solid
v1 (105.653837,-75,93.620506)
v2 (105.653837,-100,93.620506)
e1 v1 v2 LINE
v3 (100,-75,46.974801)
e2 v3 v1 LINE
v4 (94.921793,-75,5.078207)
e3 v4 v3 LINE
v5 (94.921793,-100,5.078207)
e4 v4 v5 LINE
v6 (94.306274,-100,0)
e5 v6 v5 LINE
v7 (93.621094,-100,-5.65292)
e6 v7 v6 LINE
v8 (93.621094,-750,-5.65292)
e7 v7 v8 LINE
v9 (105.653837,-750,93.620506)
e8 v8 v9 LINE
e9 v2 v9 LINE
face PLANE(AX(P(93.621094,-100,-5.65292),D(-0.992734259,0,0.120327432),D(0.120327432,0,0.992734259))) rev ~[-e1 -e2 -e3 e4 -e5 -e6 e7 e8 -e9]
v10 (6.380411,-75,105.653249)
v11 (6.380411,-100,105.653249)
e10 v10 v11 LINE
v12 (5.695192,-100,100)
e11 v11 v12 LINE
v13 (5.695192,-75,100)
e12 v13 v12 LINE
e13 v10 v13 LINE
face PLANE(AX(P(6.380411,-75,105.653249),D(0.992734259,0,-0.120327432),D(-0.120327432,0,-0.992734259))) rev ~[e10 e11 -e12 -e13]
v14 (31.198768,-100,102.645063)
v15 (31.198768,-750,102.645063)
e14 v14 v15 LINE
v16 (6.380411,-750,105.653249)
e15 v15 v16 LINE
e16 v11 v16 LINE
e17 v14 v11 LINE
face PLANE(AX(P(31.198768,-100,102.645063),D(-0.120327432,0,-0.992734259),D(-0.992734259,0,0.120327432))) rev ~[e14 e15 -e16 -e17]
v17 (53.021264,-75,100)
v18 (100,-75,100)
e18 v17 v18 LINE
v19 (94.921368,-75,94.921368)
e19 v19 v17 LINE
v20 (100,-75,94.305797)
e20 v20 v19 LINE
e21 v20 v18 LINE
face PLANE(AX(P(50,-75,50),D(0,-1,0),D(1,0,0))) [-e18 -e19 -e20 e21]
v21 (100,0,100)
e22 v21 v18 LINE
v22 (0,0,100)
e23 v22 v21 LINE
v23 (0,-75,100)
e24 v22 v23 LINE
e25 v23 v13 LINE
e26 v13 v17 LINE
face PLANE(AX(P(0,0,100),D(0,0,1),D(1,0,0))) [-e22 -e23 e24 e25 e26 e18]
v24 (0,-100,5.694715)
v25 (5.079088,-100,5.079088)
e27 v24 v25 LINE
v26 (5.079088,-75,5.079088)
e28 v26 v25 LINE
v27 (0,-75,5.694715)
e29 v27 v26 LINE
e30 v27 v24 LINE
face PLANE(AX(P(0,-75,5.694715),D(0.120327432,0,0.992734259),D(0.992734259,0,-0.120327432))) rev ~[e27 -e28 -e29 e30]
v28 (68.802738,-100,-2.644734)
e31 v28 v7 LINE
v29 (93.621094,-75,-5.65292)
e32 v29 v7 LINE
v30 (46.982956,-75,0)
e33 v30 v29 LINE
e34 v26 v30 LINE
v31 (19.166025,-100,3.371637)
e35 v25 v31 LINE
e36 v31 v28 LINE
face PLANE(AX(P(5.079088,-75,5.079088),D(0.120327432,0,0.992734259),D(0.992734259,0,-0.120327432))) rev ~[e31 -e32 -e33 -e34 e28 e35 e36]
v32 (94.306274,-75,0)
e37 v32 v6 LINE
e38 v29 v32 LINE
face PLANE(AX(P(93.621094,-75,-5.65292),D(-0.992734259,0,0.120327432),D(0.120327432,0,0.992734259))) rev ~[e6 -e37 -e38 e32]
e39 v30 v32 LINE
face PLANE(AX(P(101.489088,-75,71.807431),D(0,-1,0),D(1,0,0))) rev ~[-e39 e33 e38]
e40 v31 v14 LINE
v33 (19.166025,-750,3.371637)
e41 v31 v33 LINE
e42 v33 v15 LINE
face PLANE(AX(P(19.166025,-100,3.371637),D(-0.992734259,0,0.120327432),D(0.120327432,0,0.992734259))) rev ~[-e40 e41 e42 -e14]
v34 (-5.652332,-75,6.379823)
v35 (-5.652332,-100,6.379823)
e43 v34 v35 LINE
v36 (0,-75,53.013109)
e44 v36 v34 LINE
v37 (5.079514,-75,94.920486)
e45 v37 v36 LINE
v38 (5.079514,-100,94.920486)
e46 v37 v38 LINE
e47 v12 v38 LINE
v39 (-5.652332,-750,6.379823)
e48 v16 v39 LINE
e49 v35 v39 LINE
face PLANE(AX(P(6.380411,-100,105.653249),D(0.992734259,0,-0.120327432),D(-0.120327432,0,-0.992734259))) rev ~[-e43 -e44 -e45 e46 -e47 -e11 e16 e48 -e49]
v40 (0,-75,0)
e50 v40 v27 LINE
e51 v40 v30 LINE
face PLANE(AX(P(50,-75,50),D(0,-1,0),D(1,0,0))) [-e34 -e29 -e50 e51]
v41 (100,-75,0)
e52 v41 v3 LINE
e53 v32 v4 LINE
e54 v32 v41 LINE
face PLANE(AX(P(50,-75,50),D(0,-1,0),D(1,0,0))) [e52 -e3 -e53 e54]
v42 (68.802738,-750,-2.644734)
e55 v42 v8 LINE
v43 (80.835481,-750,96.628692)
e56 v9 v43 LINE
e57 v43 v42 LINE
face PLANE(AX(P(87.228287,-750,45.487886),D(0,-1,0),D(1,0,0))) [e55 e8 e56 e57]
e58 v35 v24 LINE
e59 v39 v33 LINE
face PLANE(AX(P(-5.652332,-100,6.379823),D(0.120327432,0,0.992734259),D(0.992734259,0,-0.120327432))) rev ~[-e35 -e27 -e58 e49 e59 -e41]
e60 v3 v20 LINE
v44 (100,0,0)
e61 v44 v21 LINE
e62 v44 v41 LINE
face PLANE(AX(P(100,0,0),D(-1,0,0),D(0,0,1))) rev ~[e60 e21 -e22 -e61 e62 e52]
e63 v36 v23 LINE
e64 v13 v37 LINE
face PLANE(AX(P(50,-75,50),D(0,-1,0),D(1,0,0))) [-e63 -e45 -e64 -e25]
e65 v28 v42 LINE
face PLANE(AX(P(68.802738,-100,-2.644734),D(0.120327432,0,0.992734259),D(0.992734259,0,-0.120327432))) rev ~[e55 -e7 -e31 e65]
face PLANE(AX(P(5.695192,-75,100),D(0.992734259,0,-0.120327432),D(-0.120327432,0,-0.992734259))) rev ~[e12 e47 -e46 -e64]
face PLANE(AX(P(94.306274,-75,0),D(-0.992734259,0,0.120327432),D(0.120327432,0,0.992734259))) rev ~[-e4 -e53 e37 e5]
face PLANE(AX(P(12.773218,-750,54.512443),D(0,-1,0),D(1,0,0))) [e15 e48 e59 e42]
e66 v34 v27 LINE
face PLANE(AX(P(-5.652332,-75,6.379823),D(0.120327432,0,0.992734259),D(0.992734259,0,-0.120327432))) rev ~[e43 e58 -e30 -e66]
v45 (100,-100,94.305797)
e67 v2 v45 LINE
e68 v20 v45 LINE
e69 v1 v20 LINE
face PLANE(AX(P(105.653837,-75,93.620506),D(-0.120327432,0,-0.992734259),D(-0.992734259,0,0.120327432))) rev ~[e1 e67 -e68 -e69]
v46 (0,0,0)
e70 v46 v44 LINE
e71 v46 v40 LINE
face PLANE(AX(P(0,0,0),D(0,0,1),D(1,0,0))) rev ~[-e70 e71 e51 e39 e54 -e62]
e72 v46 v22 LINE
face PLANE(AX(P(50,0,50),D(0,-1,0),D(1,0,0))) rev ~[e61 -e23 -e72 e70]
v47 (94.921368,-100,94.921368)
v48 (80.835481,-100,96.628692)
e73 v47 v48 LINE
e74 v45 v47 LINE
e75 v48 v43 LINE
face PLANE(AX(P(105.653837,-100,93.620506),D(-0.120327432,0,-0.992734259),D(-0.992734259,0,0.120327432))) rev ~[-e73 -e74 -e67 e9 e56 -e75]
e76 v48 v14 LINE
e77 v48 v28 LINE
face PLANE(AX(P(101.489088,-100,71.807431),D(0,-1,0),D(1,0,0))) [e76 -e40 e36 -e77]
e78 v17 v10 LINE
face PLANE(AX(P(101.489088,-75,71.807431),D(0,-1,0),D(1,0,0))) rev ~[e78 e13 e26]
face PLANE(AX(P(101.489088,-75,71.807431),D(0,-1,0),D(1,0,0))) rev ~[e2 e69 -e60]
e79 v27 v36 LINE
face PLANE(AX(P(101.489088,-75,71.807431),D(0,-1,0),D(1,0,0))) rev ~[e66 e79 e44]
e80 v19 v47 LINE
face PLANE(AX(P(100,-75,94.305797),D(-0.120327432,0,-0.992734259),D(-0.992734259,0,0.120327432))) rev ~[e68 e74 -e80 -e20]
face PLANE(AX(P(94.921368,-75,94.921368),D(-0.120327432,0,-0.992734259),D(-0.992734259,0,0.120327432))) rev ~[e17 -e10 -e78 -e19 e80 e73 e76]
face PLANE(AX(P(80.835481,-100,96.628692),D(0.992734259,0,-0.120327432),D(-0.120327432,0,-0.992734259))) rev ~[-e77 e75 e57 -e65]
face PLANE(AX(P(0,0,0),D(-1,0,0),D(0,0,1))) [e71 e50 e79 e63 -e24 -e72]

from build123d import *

# Parameters (mm, degrees)
F0_W     = 100
F0_H     = 100
F1_DEPTH = 75
F3_DEPTH = 25
F5_DEPTH = 650


# Not quite as in the source:
# - a feature names something its author has since deleted; it is built from what else it names


with BuildPart() as f1:
    # F0 (on Front) → F1 (new body)
    with BuildSketch(Plane.XZ):
        with Locations((50, 50)):
            Rectangle(F0_W, F0_H)
    extrude(amount=F1_DEPTH)

    # F2 (on face) → F3 (join)
    with BuildSketch(Plane.XZ.offset(75)):
        Polygon((100, 94.3057966884), (100, 46.974800806), (105.6538372319, 93.6205058254), align=None)
        Polygon((94.9213680166, 94.9213680166), (50, 50), (94.9217934551, 5.0782065449), (100, 46.974800806), (100, 94.3057966884), align=None)
        Polygon((0, 53.0131088143), (-5.6523319044, 6.3798231584), (0, 5.6947147534), align=None)
        Polygon((6.3804113302, 105.6532490601), (5.6951917585, 100), (53.0212637714, 100), align=None)
        Polygon((94.3062736934, 0), (46.9829557631, 0), (93.6210939972, -5.6529200762), align=None)
        Polygon((5.6951917585, 100), (5.0795135743, 94.9204864257), (50, 50), (94.9213680166, 94.9213680166), (53.0212637714, 100), align=None)
        Polygon((50, 50), (5.0790881358, 5.0790881358), (46.9829557631, 0), (94.3062736934, 0), (94.9217934551, 5.0782065449), align=None)
        Polygon((5.0795135743, 94.9204864257), (0, 53.0131088143), (0, 5.6947147534), (5.0790881358, 5.0790881358), (50, 50), align=None)
    extrude(amount=F3_DEPTH)

    # F4 (on face) → F5 (join)
    with BuildSketch(Plane.XZ.offset(100)):
        Polygon((31.1987678056, 102.6450632514), (6.3804113302, 105.6532490601), (-5.6523319044, 6.3798231584), (19.166024571, 3.3716373498), align=None)
        Polygon((93.6210939972, -5.6529200762), (105.6538372319, 93.6205058254), (80.8354807565, 96.6286916341), (68.8027375218, -2.6447342676), align=None)
    extrude(amount=F5_DEPTH)


solid = f1.part
